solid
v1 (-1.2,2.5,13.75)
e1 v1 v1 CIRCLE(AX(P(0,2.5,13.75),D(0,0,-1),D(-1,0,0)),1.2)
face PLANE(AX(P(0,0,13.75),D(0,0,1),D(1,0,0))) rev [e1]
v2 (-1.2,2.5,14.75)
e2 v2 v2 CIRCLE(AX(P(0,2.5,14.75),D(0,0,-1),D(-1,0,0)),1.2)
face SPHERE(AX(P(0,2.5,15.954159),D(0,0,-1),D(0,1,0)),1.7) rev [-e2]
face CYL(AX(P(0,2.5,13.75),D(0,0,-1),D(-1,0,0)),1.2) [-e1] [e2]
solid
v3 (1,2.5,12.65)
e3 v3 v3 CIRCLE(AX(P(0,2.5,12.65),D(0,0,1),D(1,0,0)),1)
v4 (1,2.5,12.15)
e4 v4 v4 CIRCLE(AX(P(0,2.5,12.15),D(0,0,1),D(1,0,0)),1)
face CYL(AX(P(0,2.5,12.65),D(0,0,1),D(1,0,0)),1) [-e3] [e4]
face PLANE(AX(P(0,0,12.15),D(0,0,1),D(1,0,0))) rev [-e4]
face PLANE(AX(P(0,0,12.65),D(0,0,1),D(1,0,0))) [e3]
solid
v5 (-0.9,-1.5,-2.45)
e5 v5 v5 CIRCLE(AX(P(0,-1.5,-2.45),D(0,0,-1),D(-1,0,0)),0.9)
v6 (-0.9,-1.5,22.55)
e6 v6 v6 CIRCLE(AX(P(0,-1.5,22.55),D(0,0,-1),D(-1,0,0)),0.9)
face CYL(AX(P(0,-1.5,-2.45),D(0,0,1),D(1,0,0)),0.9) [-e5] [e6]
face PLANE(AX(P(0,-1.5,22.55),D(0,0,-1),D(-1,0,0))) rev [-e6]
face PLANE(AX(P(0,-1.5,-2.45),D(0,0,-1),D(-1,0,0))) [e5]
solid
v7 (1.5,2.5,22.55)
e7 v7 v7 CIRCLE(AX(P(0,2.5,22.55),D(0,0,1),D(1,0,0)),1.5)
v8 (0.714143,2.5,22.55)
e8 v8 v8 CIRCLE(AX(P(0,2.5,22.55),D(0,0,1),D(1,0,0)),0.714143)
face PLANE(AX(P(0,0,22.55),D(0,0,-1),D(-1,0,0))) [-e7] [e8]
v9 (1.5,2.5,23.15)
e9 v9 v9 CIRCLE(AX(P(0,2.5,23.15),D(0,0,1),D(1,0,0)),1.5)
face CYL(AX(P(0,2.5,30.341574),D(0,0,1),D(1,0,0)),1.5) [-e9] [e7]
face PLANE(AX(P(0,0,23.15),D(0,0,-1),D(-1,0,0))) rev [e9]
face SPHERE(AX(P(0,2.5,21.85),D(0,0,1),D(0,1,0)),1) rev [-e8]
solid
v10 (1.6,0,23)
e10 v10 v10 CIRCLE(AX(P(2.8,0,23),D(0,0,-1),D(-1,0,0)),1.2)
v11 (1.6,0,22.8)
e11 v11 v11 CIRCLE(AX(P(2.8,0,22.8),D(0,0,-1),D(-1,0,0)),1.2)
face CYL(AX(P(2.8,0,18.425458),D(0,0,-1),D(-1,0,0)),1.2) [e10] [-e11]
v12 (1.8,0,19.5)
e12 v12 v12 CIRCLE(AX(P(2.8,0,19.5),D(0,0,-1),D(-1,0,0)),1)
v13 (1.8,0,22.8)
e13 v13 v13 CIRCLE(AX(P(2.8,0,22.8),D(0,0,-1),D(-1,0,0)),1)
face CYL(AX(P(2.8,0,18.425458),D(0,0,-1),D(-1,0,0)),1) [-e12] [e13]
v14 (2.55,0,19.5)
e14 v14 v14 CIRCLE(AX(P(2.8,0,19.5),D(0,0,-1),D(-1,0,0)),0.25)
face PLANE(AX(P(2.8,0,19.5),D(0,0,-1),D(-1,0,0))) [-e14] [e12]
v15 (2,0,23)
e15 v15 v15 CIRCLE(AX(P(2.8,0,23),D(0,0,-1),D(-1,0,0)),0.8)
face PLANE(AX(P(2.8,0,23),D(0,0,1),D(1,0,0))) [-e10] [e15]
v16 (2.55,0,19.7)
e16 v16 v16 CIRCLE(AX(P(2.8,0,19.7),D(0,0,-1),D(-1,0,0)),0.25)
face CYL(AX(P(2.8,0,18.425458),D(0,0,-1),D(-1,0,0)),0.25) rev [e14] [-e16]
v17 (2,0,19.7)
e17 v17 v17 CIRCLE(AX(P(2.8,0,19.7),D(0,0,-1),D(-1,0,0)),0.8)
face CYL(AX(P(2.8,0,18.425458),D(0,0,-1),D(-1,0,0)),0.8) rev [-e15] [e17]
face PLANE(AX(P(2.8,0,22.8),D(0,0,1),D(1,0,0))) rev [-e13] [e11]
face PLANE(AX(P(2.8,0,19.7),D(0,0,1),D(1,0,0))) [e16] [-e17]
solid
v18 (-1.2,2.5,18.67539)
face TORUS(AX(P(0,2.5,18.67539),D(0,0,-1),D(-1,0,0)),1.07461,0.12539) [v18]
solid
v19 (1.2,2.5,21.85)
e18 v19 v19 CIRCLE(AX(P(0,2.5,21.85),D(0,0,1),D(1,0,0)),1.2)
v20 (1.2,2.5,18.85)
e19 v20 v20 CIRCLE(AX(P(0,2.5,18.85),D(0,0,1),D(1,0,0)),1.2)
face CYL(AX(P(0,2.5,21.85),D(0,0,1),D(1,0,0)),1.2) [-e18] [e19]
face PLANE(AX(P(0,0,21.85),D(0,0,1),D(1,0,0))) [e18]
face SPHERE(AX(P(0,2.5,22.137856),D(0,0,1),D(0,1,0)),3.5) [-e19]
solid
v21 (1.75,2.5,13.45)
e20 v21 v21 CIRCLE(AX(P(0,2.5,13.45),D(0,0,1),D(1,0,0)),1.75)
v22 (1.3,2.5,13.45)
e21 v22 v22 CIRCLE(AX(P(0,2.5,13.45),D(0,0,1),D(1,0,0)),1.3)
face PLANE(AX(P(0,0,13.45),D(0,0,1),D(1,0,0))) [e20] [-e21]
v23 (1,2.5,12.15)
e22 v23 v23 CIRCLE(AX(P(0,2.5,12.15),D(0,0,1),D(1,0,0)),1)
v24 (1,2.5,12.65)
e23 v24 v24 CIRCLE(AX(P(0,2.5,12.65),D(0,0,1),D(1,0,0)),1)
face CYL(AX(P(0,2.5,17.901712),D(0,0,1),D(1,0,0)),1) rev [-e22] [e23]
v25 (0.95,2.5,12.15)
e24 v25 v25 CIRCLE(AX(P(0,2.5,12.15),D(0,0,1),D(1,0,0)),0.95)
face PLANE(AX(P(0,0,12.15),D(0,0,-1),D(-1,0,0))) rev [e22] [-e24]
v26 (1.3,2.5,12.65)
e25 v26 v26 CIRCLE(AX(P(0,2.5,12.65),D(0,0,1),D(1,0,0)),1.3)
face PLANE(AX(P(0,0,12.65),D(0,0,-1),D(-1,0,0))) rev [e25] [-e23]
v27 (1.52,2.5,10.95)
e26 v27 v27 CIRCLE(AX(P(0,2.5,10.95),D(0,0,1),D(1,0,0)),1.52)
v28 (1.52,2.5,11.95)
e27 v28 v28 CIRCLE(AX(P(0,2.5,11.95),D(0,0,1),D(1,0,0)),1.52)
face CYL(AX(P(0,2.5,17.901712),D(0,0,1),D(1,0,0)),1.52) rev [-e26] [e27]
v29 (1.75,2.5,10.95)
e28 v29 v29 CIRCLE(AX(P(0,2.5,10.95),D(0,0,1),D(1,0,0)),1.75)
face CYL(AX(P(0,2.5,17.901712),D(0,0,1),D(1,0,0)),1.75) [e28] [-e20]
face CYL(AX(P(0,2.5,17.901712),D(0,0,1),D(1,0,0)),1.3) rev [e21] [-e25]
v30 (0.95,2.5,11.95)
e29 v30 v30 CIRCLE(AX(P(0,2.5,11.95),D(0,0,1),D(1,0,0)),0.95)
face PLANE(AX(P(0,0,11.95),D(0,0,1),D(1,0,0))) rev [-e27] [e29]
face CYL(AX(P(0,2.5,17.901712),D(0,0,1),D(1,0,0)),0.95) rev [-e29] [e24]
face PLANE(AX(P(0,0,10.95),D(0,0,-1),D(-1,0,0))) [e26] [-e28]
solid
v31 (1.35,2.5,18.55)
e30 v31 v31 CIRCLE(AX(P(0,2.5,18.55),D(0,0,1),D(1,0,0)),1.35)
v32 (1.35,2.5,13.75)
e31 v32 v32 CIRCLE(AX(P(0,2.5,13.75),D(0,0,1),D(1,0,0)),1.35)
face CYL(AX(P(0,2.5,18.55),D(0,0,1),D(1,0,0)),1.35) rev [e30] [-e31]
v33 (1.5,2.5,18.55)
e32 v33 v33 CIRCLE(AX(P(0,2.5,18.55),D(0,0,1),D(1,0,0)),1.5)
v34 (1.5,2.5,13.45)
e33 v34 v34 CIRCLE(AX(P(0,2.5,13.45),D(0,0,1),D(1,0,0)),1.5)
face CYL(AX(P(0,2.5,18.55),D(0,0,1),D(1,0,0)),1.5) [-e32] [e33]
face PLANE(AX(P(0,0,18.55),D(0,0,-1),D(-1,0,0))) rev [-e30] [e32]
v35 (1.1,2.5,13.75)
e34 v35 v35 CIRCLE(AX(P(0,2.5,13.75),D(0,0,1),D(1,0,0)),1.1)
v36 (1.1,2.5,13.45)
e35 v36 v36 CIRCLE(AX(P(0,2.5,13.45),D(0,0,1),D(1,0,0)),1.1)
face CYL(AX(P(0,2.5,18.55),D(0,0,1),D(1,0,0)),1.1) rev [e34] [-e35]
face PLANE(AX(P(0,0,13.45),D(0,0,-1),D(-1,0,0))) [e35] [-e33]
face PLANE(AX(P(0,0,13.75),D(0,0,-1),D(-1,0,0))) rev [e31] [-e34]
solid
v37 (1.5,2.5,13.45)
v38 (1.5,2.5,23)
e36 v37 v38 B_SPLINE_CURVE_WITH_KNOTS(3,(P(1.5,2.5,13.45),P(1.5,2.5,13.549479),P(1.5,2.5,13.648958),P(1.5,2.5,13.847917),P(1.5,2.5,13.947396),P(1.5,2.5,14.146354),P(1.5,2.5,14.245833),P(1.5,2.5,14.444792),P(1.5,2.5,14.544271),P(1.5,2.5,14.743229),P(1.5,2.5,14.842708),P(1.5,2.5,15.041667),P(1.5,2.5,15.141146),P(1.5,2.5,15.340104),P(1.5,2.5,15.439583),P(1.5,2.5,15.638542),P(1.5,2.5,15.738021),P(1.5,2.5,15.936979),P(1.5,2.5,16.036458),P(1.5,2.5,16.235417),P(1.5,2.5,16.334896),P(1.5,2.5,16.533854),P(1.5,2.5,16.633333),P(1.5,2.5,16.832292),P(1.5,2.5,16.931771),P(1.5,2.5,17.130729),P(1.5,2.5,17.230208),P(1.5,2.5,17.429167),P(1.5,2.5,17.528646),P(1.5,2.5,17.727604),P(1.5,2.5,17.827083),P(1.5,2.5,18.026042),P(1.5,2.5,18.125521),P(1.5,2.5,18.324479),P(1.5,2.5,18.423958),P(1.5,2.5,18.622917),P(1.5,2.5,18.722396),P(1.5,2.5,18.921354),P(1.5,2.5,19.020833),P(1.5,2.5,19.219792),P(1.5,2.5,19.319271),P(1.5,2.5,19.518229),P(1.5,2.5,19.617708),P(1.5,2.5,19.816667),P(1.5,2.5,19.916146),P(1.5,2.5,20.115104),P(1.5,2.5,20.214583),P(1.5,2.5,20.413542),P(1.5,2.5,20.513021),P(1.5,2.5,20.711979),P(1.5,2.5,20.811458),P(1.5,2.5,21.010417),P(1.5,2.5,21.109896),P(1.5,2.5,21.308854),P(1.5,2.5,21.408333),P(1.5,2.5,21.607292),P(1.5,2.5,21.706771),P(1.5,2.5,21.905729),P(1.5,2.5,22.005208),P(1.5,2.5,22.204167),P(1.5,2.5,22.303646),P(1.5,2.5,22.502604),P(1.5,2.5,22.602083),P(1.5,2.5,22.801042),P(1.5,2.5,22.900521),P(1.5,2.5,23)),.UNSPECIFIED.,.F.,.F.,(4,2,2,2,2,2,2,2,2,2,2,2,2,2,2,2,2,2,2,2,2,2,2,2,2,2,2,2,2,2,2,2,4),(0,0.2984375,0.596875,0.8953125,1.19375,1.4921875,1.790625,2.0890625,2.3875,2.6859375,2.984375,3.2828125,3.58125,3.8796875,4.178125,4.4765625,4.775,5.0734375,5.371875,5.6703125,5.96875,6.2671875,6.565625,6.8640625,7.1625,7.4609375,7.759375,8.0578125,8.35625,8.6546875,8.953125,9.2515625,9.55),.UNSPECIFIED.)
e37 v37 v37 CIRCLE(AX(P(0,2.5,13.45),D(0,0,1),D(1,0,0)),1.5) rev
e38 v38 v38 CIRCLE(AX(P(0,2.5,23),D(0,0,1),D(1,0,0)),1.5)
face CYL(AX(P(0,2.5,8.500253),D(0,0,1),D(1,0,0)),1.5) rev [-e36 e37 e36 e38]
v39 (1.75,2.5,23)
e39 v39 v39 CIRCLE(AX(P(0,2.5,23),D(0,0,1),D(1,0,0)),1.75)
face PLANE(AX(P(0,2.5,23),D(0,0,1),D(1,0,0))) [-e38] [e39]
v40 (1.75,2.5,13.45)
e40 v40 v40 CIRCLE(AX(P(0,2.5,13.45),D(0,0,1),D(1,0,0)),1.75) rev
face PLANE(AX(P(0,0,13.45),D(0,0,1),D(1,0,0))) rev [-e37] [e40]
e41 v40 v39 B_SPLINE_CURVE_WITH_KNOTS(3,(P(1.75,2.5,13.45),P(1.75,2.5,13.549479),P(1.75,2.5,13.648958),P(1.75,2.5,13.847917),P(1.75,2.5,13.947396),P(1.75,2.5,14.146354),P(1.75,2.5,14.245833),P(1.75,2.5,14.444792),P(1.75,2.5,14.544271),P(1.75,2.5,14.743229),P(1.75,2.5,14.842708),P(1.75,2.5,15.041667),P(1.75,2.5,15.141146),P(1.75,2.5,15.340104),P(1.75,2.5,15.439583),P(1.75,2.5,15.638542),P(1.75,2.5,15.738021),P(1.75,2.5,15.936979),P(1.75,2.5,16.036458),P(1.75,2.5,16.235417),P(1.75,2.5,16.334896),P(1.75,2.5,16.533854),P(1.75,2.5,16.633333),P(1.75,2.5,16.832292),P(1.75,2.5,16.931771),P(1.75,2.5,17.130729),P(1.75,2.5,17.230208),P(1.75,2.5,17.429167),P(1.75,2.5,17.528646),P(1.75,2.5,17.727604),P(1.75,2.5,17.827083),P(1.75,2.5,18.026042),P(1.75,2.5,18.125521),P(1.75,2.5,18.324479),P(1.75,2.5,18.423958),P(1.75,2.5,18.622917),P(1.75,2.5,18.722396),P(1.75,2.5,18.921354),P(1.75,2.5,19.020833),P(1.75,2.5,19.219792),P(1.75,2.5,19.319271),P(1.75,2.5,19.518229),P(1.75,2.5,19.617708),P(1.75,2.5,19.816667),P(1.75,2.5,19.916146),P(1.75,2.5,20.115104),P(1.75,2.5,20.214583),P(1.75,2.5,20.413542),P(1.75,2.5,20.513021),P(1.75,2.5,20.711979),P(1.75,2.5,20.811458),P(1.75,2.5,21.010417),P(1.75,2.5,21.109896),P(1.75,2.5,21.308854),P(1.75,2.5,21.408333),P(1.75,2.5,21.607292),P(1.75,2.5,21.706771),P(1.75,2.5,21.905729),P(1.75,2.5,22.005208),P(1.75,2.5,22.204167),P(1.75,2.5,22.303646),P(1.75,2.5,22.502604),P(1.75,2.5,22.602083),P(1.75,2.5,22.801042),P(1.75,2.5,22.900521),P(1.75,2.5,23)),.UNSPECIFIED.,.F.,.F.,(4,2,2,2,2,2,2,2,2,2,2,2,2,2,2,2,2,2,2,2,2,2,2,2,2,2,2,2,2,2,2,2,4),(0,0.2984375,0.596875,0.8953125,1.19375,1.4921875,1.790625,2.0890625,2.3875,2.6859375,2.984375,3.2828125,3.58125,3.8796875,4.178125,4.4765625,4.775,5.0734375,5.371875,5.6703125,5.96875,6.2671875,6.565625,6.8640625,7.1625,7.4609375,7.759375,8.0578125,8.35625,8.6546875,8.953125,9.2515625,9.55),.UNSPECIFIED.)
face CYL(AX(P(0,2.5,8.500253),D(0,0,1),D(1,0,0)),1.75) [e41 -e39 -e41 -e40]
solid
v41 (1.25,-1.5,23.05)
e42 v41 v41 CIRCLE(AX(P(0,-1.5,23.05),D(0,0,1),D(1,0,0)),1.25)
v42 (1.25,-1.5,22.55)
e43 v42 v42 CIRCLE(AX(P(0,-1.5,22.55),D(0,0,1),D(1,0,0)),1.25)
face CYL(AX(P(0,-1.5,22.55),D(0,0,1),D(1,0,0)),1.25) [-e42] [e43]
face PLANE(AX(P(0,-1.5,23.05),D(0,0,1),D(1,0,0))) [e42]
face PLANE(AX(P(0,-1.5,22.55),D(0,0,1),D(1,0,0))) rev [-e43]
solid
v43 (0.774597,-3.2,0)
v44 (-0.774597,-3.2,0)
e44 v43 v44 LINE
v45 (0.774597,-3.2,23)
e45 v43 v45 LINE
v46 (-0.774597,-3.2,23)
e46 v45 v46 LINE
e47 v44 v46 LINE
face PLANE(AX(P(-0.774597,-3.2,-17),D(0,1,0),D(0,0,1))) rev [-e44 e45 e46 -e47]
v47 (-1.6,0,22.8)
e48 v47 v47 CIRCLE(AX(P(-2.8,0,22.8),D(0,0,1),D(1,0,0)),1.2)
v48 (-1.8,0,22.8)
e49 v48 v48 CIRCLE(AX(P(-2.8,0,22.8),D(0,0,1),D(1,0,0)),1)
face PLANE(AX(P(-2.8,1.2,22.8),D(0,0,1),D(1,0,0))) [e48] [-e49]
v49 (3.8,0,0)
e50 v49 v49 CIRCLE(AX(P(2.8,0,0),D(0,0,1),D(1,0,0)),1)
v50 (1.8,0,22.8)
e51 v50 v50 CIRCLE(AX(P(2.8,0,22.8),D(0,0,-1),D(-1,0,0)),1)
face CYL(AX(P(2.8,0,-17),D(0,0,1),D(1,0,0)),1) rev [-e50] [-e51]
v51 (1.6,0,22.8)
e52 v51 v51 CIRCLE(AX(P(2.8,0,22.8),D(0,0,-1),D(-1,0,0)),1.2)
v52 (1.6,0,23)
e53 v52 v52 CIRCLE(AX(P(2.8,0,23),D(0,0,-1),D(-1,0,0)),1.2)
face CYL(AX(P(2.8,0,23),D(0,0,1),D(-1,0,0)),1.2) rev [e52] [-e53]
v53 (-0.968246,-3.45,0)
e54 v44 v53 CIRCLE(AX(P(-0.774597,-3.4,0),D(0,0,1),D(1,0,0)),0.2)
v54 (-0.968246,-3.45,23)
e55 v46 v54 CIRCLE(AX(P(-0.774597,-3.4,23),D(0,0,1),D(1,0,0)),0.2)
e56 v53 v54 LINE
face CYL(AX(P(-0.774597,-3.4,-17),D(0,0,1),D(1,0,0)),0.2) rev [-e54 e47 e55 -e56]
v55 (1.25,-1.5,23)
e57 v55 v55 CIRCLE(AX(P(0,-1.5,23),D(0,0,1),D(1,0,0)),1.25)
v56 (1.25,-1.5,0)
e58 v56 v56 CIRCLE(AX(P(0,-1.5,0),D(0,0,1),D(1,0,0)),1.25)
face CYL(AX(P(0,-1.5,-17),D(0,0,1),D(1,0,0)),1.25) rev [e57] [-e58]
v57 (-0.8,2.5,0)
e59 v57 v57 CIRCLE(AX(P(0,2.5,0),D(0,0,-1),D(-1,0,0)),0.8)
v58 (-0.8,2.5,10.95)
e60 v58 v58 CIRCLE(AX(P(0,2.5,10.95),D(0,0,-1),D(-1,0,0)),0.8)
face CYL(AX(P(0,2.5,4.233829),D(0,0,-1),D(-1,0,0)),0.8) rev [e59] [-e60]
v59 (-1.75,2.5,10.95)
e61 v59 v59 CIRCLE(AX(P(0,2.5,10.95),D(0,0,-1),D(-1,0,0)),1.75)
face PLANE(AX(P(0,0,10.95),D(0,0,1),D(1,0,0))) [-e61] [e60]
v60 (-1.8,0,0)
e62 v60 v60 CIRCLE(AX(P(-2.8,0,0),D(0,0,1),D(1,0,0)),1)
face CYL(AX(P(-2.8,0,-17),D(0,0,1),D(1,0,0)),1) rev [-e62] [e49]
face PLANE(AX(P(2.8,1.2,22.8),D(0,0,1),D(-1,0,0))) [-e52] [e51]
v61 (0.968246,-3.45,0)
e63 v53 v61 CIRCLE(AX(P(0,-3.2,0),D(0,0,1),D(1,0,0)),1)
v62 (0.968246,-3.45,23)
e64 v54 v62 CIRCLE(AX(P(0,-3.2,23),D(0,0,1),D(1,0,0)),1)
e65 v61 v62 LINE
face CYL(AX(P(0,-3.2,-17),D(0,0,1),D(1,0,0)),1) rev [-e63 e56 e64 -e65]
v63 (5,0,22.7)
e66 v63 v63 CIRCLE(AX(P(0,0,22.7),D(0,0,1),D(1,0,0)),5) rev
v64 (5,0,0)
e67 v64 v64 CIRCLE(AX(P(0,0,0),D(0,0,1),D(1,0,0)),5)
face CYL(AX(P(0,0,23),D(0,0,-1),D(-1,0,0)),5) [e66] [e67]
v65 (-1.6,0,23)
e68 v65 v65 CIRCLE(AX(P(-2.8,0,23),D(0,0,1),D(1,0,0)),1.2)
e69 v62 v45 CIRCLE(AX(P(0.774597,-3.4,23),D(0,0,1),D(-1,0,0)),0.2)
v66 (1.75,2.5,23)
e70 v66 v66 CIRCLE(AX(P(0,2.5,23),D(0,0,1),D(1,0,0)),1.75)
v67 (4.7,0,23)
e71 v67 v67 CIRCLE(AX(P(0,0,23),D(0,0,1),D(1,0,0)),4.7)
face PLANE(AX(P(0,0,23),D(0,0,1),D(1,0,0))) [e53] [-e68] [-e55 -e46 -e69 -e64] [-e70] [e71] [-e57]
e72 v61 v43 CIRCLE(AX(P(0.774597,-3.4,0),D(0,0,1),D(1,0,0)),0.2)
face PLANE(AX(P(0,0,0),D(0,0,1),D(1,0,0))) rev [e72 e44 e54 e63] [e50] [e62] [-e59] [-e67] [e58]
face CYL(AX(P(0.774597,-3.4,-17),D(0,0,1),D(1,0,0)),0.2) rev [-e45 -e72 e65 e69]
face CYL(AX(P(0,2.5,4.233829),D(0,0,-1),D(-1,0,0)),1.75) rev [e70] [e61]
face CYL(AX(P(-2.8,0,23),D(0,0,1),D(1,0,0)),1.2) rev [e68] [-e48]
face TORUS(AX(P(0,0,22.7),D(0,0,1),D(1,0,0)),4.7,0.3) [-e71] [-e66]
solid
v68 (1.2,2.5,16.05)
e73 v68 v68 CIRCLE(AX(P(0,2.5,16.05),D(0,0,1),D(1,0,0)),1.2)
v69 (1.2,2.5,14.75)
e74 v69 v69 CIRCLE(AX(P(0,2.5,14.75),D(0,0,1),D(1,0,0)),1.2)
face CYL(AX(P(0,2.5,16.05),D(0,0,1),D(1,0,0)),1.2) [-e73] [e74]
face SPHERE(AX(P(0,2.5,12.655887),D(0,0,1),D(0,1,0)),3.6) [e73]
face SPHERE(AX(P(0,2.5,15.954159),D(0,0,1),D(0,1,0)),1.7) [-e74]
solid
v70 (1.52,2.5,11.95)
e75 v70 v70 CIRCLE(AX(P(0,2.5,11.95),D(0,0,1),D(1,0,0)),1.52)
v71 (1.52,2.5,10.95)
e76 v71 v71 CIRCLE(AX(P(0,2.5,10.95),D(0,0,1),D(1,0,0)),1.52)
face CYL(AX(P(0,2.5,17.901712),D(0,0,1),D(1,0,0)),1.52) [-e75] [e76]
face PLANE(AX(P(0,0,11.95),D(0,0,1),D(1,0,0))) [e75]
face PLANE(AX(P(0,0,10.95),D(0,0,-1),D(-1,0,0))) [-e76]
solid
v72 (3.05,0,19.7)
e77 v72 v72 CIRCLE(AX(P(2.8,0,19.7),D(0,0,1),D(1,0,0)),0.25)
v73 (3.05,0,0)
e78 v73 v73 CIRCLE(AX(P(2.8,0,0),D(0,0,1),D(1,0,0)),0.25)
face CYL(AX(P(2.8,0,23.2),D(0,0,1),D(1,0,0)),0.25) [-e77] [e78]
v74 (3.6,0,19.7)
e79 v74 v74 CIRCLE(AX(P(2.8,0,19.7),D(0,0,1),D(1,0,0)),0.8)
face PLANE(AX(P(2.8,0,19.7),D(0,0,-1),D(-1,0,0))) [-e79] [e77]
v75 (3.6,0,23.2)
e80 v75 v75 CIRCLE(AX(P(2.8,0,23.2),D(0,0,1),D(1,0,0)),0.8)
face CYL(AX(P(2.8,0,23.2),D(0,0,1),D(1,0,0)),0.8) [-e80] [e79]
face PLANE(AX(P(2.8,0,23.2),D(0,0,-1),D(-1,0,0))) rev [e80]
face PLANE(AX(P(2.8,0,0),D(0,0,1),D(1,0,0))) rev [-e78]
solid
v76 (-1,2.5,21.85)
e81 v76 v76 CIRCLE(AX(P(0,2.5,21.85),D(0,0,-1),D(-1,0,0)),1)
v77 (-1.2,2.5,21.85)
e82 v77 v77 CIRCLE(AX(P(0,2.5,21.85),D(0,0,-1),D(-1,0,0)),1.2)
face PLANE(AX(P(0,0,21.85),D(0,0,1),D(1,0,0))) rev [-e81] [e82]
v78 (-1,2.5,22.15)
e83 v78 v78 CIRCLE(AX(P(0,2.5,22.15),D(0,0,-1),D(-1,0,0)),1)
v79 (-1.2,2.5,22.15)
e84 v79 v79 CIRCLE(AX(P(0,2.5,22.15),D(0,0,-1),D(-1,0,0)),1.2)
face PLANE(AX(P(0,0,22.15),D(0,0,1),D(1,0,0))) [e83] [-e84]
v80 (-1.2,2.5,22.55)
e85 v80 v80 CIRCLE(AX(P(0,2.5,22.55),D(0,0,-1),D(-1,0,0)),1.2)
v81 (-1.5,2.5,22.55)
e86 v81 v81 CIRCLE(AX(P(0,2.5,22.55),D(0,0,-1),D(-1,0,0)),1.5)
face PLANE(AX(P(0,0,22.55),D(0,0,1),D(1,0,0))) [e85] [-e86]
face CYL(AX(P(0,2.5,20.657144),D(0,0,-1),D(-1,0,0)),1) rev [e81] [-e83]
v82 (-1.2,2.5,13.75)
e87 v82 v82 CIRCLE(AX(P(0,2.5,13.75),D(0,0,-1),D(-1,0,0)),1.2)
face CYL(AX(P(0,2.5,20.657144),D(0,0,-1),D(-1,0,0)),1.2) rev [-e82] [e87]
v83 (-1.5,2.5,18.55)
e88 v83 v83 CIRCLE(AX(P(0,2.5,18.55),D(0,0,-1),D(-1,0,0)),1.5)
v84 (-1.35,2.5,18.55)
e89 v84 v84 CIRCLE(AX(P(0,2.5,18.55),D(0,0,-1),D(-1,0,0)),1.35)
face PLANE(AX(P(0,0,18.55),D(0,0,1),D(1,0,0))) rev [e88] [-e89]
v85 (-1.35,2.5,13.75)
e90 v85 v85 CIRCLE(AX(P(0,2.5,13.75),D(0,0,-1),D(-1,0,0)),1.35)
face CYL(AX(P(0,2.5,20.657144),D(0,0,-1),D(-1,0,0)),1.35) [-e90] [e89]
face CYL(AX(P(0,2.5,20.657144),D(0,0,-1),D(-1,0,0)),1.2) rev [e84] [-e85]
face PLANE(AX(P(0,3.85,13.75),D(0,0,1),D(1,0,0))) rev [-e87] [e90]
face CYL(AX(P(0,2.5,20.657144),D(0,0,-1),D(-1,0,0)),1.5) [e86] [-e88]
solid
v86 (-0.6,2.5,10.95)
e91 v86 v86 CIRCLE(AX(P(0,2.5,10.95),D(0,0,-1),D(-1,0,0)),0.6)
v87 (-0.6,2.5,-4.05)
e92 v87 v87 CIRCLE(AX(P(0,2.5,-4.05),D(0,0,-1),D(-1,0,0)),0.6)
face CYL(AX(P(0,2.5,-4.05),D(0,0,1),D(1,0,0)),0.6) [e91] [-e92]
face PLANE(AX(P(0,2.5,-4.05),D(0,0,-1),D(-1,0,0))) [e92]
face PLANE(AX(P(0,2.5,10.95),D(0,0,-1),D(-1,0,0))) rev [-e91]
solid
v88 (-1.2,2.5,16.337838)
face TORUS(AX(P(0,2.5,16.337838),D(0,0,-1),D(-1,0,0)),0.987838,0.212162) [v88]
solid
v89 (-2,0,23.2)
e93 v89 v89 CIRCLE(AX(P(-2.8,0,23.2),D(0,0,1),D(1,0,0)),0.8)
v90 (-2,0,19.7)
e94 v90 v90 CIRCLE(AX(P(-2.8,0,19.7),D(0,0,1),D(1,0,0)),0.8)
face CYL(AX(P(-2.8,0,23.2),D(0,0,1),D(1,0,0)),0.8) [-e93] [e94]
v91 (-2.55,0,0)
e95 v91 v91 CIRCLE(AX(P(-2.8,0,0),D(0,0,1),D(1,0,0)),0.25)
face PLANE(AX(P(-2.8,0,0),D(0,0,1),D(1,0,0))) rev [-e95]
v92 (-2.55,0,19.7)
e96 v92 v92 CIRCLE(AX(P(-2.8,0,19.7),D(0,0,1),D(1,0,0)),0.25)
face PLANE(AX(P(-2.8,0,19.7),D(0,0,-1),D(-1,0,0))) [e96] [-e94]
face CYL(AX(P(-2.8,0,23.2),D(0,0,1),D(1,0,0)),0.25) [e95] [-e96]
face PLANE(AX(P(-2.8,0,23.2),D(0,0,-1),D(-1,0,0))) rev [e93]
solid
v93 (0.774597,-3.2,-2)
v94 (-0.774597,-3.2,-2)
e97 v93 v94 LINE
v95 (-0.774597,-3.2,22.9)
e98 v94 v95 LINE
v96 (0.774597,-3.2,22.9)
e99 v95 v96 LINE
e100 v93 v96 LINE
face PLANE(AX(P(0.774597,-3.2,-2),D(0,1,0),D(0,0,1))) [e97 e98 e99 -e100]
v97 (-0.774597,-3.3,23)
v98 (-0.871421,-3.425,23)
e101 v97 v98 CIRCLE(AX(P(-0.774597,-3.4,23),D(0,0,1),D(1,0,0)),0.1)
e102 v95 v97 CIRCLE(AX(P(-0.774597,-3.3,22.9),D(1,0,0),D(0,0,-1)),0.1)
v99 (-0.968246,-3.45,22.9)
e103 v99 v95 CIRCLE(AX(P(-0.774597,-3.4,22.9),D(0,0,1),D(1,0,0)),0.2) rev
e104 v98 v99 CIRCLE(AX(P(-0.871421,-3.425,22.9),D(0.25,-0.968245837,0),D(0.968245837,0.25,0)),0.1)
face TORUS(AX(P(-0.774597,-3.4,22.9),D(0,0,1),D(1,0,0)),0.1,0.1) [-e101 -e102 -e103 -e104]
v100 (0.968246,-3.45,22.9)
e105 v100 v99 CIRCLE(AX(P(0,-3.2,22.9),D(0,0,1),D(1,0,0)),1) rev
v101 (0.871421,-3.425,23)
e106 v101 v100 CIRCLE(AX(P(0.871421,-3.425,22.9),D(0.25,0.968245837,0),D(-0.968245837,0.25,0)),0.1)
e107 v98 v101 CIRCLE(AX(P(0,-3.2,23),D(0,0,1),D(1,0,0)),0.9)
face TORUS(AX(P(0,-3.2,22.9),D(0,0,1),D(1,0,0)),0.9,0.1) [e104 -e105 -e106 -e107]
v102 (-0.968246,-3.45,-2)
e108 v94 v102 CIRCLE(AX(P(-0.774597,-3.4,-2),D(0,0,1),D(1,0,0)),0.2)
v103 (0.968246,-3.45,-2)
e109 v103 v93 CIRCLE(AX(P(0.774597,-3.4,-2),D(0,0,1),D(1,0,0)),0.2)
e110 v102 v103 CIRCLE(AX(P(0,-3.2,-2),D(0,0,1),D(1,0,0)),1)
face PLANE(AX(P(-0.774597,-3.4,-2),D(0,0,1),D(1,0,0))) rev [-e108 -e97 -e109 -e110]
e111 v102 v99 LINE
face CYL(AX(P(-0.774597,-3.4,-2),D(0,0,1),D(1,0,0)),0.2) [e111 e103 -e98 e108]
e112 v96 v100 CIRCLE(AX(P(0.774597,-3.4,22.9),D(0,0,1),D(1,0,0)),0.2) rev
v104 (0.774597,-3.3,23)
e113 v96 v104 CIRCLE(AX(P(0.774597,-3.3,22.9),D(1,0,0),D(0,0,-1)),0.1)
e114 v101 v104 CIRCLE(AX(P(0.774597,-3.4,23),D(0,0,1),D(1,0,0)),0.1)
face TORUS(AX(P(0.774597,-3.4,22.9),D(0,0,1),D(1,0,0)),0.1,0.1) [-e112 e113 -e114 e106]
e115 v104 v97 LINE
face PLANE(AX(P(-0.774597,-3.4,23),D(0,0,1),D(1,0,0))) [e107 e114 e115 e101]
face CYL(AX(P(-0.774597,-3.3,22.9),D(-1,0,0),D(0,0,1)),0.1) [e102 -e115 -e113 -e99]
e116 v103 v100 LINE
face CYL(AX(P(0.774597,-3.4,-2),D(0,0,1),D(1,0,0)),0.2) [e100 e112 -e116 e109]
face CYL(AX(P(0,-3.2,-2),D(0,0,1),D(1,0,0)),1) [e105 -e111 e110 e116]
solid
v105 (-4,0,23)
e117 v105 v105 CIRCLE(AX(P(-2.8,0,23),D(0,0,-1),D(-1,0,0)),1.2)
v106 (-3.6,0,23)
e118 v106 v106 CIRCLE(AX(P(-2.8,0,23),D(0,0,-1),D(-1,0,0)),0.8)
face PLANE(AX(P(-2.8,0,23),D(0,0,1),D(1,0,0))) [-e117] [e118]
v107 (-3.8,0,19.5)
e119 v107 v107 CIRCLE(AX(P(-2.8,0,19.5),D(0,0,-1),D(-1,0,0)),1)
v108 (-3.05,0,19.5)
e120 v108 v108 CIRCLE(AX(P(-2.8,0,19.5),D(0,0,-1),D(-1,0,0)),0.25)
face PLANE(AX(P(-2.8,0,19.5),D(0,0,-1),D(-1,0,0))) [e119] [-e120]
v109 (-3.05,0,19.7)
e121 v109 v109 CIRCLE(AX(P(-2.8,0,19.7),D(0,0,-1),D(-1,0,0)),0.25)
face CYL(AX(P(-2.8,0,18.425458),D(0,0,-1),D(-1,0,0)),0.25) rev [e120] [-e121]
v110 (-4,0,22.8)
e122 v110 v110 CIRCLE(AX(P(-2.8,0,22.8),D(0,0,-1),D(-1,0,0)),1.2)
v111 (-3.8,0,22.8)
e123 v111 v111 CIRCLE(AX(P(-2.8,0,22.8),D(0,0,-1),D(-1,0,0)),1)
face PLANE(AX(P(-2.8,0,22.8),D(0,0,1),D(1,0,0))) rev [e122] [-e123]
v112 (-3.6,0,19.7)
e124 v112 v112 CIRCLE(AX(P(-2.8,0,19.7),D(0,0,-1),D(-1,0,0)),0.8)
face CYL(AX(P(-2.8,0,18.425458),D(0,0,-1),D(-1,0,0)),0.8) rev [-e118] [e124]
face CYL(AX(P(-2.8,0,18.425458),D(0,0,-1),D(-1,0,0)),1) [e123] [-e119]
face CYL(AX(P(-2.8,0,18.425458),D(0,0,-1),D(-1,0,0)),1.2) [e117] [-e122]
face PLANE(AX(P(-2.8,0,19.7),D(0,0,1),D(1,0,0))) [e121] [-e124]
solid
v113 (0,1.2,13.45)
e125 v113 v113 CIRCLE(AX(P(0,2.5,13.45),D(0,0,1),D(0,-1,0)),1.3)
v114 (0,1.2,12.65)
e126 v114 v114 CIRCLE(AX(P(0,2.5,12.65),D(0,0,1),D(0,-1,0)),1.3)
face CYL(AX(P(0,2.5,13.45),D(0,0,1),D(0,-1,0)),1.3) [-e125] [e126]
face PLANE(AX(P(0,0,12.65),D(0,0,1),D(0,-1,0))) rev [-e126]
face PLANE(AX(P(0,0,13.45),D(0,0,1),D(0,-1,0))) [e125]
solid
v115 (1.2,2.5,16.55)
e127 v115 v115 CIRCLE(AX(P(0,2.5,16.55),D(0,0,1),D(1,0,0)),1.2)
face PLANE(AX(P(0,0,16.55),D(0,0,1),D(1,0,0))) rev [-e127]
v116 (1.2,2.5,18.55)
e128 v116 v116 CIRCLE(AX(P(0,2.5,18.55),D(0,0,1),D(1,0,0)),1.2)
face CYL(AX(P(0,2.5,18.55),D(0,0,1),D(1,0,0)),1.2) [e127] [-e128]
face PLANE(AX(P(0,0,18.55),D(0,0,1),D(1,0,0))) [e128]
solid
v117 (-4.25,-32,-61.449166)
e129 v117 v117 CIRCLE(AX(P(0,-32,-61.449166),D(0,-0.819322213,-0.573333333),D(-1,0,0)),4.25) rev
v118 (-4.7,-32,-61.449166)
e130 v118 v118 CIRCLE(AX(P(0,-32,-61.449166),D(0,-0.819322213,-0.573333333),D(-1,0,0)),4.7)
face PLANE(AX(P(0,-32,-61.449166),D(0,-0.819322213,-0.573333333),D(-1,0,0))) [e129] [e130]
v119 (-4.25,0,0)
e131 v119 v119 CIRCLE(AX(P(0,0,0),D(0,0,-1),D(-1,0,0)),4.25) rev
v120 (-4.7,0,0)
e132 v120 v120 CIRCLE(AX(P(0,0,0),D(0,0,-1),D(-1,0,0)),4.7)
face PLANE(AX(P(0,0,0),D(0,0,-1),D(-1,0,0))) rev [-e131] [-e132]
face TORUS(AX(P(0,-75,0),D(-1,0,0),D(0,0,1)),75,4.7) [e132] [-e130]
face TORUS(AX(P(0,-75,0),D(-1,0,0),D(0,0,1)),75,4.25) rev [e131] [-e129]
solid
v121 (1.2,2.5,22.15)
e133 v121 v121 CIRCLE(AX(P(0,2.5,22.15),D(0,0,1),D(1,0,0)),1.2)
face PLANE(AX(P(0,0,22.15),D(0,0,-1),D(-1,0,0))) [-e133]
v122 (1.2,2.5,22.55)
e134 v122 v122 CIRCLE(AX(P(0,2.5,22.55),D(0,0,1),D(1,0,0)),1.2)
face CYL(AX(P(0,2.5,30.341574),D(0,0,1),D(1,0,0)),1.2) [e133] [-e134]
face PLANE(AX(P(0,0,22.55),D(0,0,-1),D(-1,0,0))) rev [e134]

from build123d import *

# Parameters (mm, degrees)
SKETCH1_R      = 5
EXTRUDE1_DEPTH = 23
SKETCH2_R      = 1.5
SKETCH2_R_2    = 1
SKETCH2_R_3    = 1.25
EXTRUDE2_DEPTH = 40
SKETCH3_W      = 10.95
SKETCH3_H      = 0.7
SKETCH_W       = 2.5
SKETCH_H       = 0.25
EXTRUDE3_START = -9.55
SKETCH4_R      = 1.75
EXTRUDE3_DEPTH = 9.55
SKETCH5_W      = 0.2
SKETCH5_H      = 0.2
EXTRUDE4_DEPTH = 25
FILLET2_R      = 0.1
FILLET3_R      = 0.3
SKETCH_3_W     = 3
SKETCH_3_H     = 1.2
SKETCH_4_W     = 2
SKETCH_4_H     = 1.2
SKETCH_5_W     = 1.3
SKETCH_5_H     = 1.2
SKETCH_7_W     = 0.8
SKETCH_7_H     = 1.3
SKETCH_8_W     = 0.5
SKETCH_8_H     = 1
SKETCH9_W      = 4
SKETCH9_H      = 0.3
SKETCH9_W_2    = 0.3
SKETCH9_H_2    = 0.2
SKETCH9_W_3    = 4.8
SKETCH9_H_3    = 0.15
SKETCH10_W     = 0.3
SKETCH10_H     = 0.25
SKETCH10_W_2   = 5.1
SKETCH10_H_2   = 0.15
SKETCH11_W     = 1.5
SKETCH11_H     = 0.45
SKETCH11_W_2   = 0.5
SKETCH11_H_2   = 0.3
SKETCH11_W_3   = 1
SKETCH11_H_3   = 0.23
SKETCH13_R     = 0.125390483
SKETCH_10_R    = 0.212162274
SKETCH15_R     = 1.75
SKETCH15_R_2   = 1.5
EXTRUDE5_DEPTH = 9.55
SKETCH16_R     = 0.6
EXTRUDE6_DEPTH = 15
EXTRUDE7_START = 0.05
SKETCH17_R     = 1.25
EXTRUDE7_DEPTH = 0.5
SKETCH18_R     = 0.9
EXTRUDE8_DEPTH = 25
SKETCH19_W     = 3.5
SKETCH19_H     = 0.8
SKETCH19_W_2   = 19.7
SKETCH19_H_2   = 0.25
SKETCH20_W     = 0.2
SKETCH20_H     = 0.4
SKETCH20_H_2   = 0.55
SKETCH21_W     = 3.5
SKETCH21_H     = 0.8
SKETCH21_W_2   = 19.7
SKETCH21_H_2   = 0.25
SKETCH22_W     = 0.2
SKETCH22_H     = 0.4
SKETCH22_H_2   = 0.55
SKETCH23_R     = 4.7
SKETCH23_R_2   = 4.25


with BuildPart() as part:
    # Sketch1 → Extrude1 (new body)
    with BuildSketch(Plane.XY):
        Circle(SKETCH1_R)
    extrude(amount=EXTRUDE1_DEPTH)

    # Sketch2 → Extrude2 (cut)
    with BuildSketch(Plane.XY.offset(23)):
        with Locations((0, 2.5)):
            Circle(SKETCH2_R)
        with Locations((2.8, 0)):
            Circle(SKETCH2_R_2)
        with Locations((0, -1.5)):
            Circle(SKETCH2_R_3)
        with Locations((-2.8, 0)):
            Circle(SKETCH2_R_2)
        with BuildLine():
            Line((-0.774596669, -3.2), (0.774596669, -3.2))
            ThreePointArc((0.774596669, -3.2), (0.932710552, -3.277525513), (0.968245837, -3.45))
            ThreePointArc((0.968245837, -3.45), (0, -4.2), (-0.968245837, -3.45))
            ThreePointArc((-0.968245837, -3.45), (-0.932710552, -3.277525513), (-0.774596669, -3.2))
        make_face()
    extrude(amount=-EXTRUDE2_DEPTH, mode=Mode.SUBTRACT)

    # Sketch3 → Revolve1 (revolve)
    with BuildSketch(Plane(origin=(0, 0, 0), x_dir=(0, 0, -1), z_dir=(1, 0, 0)), mode=Mode.PRIVATE) as revolve1_sk:
        with Locations((-5.475, 3.65)):
            Rectangle(SKETCH3_W, SKETCH3_H)
    revolve(revolve1_sk.sketch.rotate(Axis((0, 2.5, 4.233828538), (0, 0, 1)), 270), axis=Axis((0, 2.5, 4.233828538), (0, 0, 1)))

    # Sketch → Cut-Revolve1 (revolve, cut)
    with BuildSketch(Plane(origin=(0, 0, 0), x_dir=(0, 0, -1), z_dir=(1, 0, 0)), mode=Mode.PRIVATE) as cut_revolve1_sk:
        with Locations((-12.2, 4.125)):
            Rectangle(SKETCH_W, SKETCH_H)
    revolve(cut_revolve1_sk.sketch.rotate(Axis((0, 2.5, 4.233828538), (0, 0, 1)), 90), axis=Axis((0, 2.5, 4.233828538), (0, 0, 1)), mode=Mode.SUBTRACT)

    # Sketch4 → Extrude3 (cut)
    with BuildSketch(Plane.XY.offset(23).offset(EXTRUDE3_START)):
        with Locations(Location((0, 2.5, 0), (0, 0, 180))):
            Circle(SKETCH4_R)
    extrude(amount=EXTRUDE3_DEPTH, mode=Mode.SUBTRACT)

    # Sketch5 → Cut-Revolve2 (revolve, cut)
    with BuildSketch(Plane(origin=(-2.8, 0, 0), x_dir=(0, 0, -1), z_dir=(1, 0, 0)), mode=Mode.PRIVATE) as cut_revolve2_sk:
        with Locations((-22.9, 1.1)):
            Rectangle(SKETCH5_W, SKETCH5_H)
    cut_revolve2 = revolve(cut_revolve2_sk.sketch.rotate(Axis((-2.8, 0, 23), (0, 0, -1)), 90), axis=Axis((-2.8, 0, 23), (0, 0, -1)), mode=Mode.SUBTRACT)

    # Mirror1: Cut-Revolve2 across plane
    add(cut_revolve2.mirror(Plane(origin=(0, 0, 0), x_dir=(0, 0, 1), z_dir=(1, 0, 0))), mode=Mode.SUBTRACT)

    # Fillet3
    fillet3_edges = [part.edges().sort_by_distance(p)[0] for p in [
        (-5, 0, 23),
    ]]
    fillet(fillet3_edges, radius=FILLET3_R)


with BuildPart() as body_2:
    # Sketch6 → Extrude4 (new body)
    with BuildSketch(Plane.XY.offset(23)):
        with BuildLine():
            Line((0.774596669, -3.2), (-0.774596669, -3.2))
            ThreePointArc((-0.774596669, -3.2), (-0.932710552, -3.277525513), (-0.968245837, -3.45))
            ThreePointArc((-0.968245837, -3.45), (0, -4.2), (0.968245837, -3.45))
            ThreePointArc((0.968245837, -3.45), (0.932710552, -3.277525513), (0.774596669, -3.2))
        make_face()
    extrude(amount=-EXTRUDE4_DEPTH)

    # Fillet2
    fillet2_edges = [body_2.edges().sort_by_distance(p)[0] for p in [
        (0, -3.2, 23),
        (0.932710552, -3.277525513, 23),
        (0, -4.2, 23),
        (-0.932710552, -3.277525513, 23),
    ]]
    fillet(fillet2_edges, radius=FILLET2_R)


with BuildPart() as body_3:
    # Sketch7 → Revolve2 (revolve)
    with BuildSketch(Plane(origin=(0, 0, 0), x_dir=(0, 0, -1), z_dir=(1, 0, 0))):
        with BuildLine():
            Line((-22.55, 4), (-23.15, 4))
            Line((-23.15, 4), (-23.15, 2.5))
            Line((-23.15, 2.5), (-22.85, 2.5))
            ThreePointArc((-22.85, 2.5), (-22.771954446, 2.887298335), (-22.55, 3.214142843))
            Line((-22.55, 3.214142843), (-22.55, 3.7))
            Line((-22.55, 3.7), (-22.55, 4))
        make_face()
    revolve(axis=Axis((0, 2.5, 30.341573658), (0, 0, -1)))


with BuildPart() as body_4:
    # Sketch 2 → Revolve3 (revolve)
    with BuildSketch(Plane(origin=(0, 0, 0), x_dir=(0, 0, -1), z_dir=(1, 0, 0)), mode=Mode.PRIVATE) as revolve3_sk:
        Polygon((-22.15, 3.7), (-22.55, 3.7), (-22.55, 3.214142843), (-22.55, 2.5), (-22.15, 2.5), align=None)
    revolve(revolve3_sk.sketch.rotate(Axis((0, 2.5, 30.341573658), (0, 0, -1)), 90), axis=Axis((0, 2.5, 30.341573658), (0, 0, -1)))


with BuildPart() as body_5:
    # Sketch 3 → Revolve4 (revolve)
    with BuildSketch(Plane(origin=(0, 0, 0), x_dir=(0, 0, -1), z_dir=(1, 0, 0))):
        with Locations((-20.35, 3.1)):
            Rectangle(SKETCH_3_W, SKETCH_3_H)
        with BuildLine():
            ThreePointArc((-18.85, 3.7), (-18.69130037, 3.109303883), (-18.637856445, 2.5))
            Line((-18.637856445, 2.5), (-18.85, 2.5))
            Line((-18.85, 2.5), (-18.85, 3.7))
        make_face()
    revolve(axis=Axis((0, 2.5, 21.85), (0, 0, -1)))


with BuildPart() as body_6:
    # Sketch 4 → Revolve5 (revolve)
    with BuildSketch(Plane(origin=(0, 0, 0), x_dir=(0, 0, -1), z_dir=(1, 0, 0)), mode=Mode.PRIVATE) as revolve5_sk:
        with Locations((-17.55, 3.1)):
            Rectangle(SKETCH_4_W, SKETCH_4_H)
    revolve(revolve5_sk.sketch.rotate(Axis((0, 2.5, 18.55), (0, 0, -1)), 90), axis=Axis((0, 2.5, 18.55), (0, 0, -1)))


with BuildPart() as body_7:
    # Sketch 5 → Revolve6 (revolve)
    with BuildSketch(Plane(origin=(0, 0, 0), x_dir=(0, 0, -1), z_dir=(1, 0, 0))):
        with Locations((-15.4, 3.1)):
            Rectangle(SKETCH_5_W, SKETCH_5_H)
        with BuildLine():
            ThreePointArc((-14.75, 3.7), (-14.383002069, 3.149202943), (-14.254159458, 2.5))
            Line((-14.254159458, 2.5), (-14.75, 2.5))
            Line((-14.75, 2.5), (-14.75, 3.7))
        make_face()
        with BuildLine():
            Line((-16.05, 2.5), (-16.05, 3.7))
            ThreePointArc((-16.05, 3.7), (-16.204042265, 3.108767123), (-16.25588745, 2.5))
            Line((-16.25588745, 2.5), (-16.05, 2.5))
        make_face()
    revolve(axis=Axis((0, 2.5, 16.05), (0, 0, -1)))


with BuildPart() as body_8:
    # Sketch 6 → Revolve7 (revolve)
    with BuildSketch(Plane(origin=(0, 0, 0), x_dir=(0, 0, -1), z_dir=(1, 0, 0)), mode=Mode.PRIVATE) as revolve7_sk:
        with BuildLine():
            Line((-14.75, 3.7), (-13.75, 3.7))
            Line((-13.75, 3.7), (-13.75, 2.5))
            Line((-13.75, 2.5), (-14.254159458, 2.5))
            ThreePointArc((-14.254159458, 2.5), (-14.383002069, 3.149202943), (-14.75, 3.7))
        make_face()
    revolve(revolve7_sk.sketch.rotate(Axis((0, 2.5, 13.75), (0, 0, 1)), 270), axis=Axis((0, 2.5, 13.75), (0, 0, 1)))


with BuildPart() as body_9:
    # Sketch 7 → Revolve8 (revolve)
    with BuildSketch(Plane(origin=(0, 0, 0), x_dir=(0, 0, -1), z_dir=(1, 0, 0)), mode=Mode.PRIVATE) as revolve8_sk:
        with Locations((-13.05, 3.15)):
            Rectangle(SKETCH_7_W, SKETCH_7_H)
    revolve(revolve8_sk.sketch.rotate(Axis((0, 2.5, 13.45), (0, 0, -1)), 90), axis=Axis((0, 2.5, 13.45), (0, 0, -1)))


with BuildPart() as body_10:
    # Sketch 8 → Revolve9 (revolve)
    with BuildSketch(Plane(origin=(0, 0, 0), x_dir=(0, 0, -1), z_dir=(1, 0, 0)), mode=Mode.PRIVATE) as revolve9_sk:
        with Locations((-12.4, 3)):
            Rectangle(SKETCH_8_W, SKETCH_8_H)
    revolve(revolve9_sk.sketch.rotate(Axis((0, 2.5, 12.65), (0, 0, -1)), 90), axis=Axis((0, 2.5, 12.65), (0, 0, -1)))


with BuildPart() as body_11:
    # Sketch9 → Revolve11 (revolve)
    with BuildSketch(Plane(origin=(0, 0, 0), x_dir=(0, 0, -1), z_dir=(1, 0, 0)), mode=Mode.PRIVATE) as revolve11_sk:
        with Locations((-20.55, 3.85)):
            Rectangle(SKETCH9_W, SKETCH9_H)
        with Locations((-22, 3.6)):
            Rectangle(SKETCH9_W_2, SKETCH9_H_2)
        with Locations((-16.15, 3.775)):
            Rectangle(SKETCH9_W_3, SKETCH9_H_3)
    revolve(revolve11_sk.sketch.rotate(Axis((0, 2.5, 20.657143519), (0, 0, 1)), 90), axis=Axis((0, 2.5, 20.657143519), (0, 0, 1)))


with BuildPart() as body_12:
    # Sketch10 → Revolve12 (revolve)
    with BuildSketch(Plane(origin=(0, 0, 0), x_dir=(0, 0, -1), z_dir=(1, 0, 0)), mode=Mode.PRIVATE) as revolve12_sk:
        with Locations((-13.6, 3.725)):
            Rectangle(SKETCH10_W, SKETCH10_H)
        with Locations((-16, 3.925)):
            Rectangle(SKETCH10_W_2, SKETCH10_H_2)
    revolve(revolve12_sk.sketch.rotate(Axis((0, 2.5, 20.657143519), (0, 0, -1)), 90), axis=Axis((0, 2.5, 20.657143519), (0, 0, -1)))


with BuildPart() as body_13:
    # Sketch11 → Revolve13 (revolve)
    with BuildSketch(Plane(origin=(0, 0, 0), x_dir=(0, 0, -1), z_dir=(1, 0, 0)), mode=Mode.PRIVATE) as revolve13_sk:
        with Locations((-12.7, 4.025)):
            Rectangle(SKETCH11_W, SKETCH11_H)
        with Locations((-12.4, 3.65)):
            Rectangle(SKETCH11_W_2, SKETCH11_H_2)
        Polygon((-11.95, 3.8), (-12.15, 3.8), (-12.15, 3.5), (-12.15, 3.45), (-11.95, 3.45), align=None)
        with Locations((-11.45, 4.135)):
            Rectangle(SKETCH11_W_3, SKETCH11_H_3)
    revolve(revolve13_sk.sketch.rotate(Axis((0, 2.5, 17.901712112), (0, 0, -1)), 90), axis=Axis((0, 2.5, 17.901712112), (0, 0, -1)))


with BuildPart() as body_14:
    # Sketch 9 → Revolve14 (revolve)
    with BuildSketch(Plane(origin=(0, 0, 0), x_dir=(0, 0, -1), z_dir=(1, 0, 0)), mode=Mode.PRIVATE) as revolve14_sk:
        Polygon((-11.95, 4.02), (-11.95, 3.8), (-11.95, 3.45), (-11.95, 2.5), (-10.95, 2.5), (-10.95, 4.02), align=None)
    revolve(revolve14_sk.sketch.rotate(Axis((0, 2.5, 17.901712112), (0, 0, -1)), 180), axis=Axis((0, 2.5, 17.901712112), (0, 0, -1)))


with BuildPart() as body_15:
    # Sketch13 → Revolve15 (revolve)
    with BuildSketch(Plane(origin=(0, 0, 0), x_dir=(0, 0, -1), z_dir=(1, 0, 0)), mode=Mode.PRIVATE) as revolve15_sk:
        with Locations((-18.675390483, 3.574609517)):
            Circle(SKETCH13_R)
    revolve(revolve15_sk.sketch.rotate(Axis((0, 2.5, 18.675390483), (0, 0, 1)), 270), axis=Axis((0, 2.5, 18.675390483), (0, 0, 1)))


with BuildPart() as body_16:
    # Sketch 10 → Revolve16 (revolve)
    with BuildSketch(Plane(origin=(0, 0, 0), x_dir=(0, 0, -1), z_dir=(1, 0, 0)), mode=Mode.PRIVATE) as revolve16_sk:
        with Locations((-16.337837726, 3.487837726)):
            Circle(SKETCH_10_R)
    revolve(revolve16_sk.sketch.rotate(Axis((0, 2.5, 18.55), (0, 0, 1)), 270), axis=Axis((0, 2.5, 18.55), (0, 0, 1)))


with BuildPart() as body_17:
    # Sketch15 → Extrude5 (new body)
    with BuildSketch(Plane.XY.offset(23)):
        with Locations((0, 2.5)):
            Circle(SKETCH15_R)
        with Locations((0, 2.5)):
            Circle(SKETCH15_R_2, mode=Mode.SUBTRACT)
    extrude(amount=-EXTRUDE5_DEPTH)


with BuildPart() as body_18:
    # Sketch16 → Extrude6 (new body)
    with BuildSketch(Plane(origin=(0, 0, 10.95), x_dir=(-1, 0, 0), z_dir=(0, 0, -1))):
        with Locations((0, 2.5)):
            Circle(SKETCH16_R)
    extrude(amount=EXTRUDE6_DEPTH)


with BuildPart() as body_19:
    # Sketch17 → Extrude7 (new body)
    with BuildSketch(Plane.XY.offset(23).offset(EXTRUDE7_START)):
        with Locations((0, -1.5)):
            Circle(SKETCH17_R)
    extrude(amount=-EXTRUDE7_DEPTH)


with BuildPart() as body_20:
    # Sketch18 → Extrude8 (new body)
    with BuildSketch(Plane(origin=(0, 0, 22.55), x_dir=(-1, 0, 0), z_dir=(0, 0, -1))):
        with Locations((0, -1.5)):
            Circle(SKETCH18_R)
    extrude(amount=EXTRUDE8_DEPTH)


with BuildPart() as body_21:
    # Sketch19 → Revolve17 (revolve)
    with BuildSketch(Plane(origin=(-2.8, 0, 0), x_dir=(0, 0, -1), z_dir=(1, 0, 0)), mode=Mode.PRIVATE) as revolve17_sk:
        with Locations((-21.45, 0.4)):
            Rectangle(SKETCH19_W, SKETCH19_H)
        with Locations((-9.85, 0.125)):
            Rectangle(SKETCH19_W_2, SKETCH19_H_2)
    revolve(revolve17_sk.sketch.rotate(Axis((-2.8, 0, 23.2), (0, 0, -1)), 90), axis=Axis((-2.8, 0, 23.2), (0, 0, -1)))


with BuildPart() as body_22:
    # Sketch20 → Revolve18 (revolve)
    with BuildSketch(Plane(origin=(-2.8, 0, 0), x_dir=(0, 0, -1), z_dir=(1, 0, 0)), mode=Mode.PRIVATE) as revolve18_sk:
        with Locations((-22.9, 1)):
            Rectangle(SKETCH20_W, SKETCH20_H)
        Polygon((-22.8, 1), (-22.8, 0.8), (-19.7, 0.8), (-19.5, 0.8), (-19.5, 1), align=None)
        with Locations((-19.6, 0.525)):
            Rectangle(SKETCH20_W, SKETCH20_H_2)
    revolve(revolve18_sk.sketch.rotate(Axis((-2.8, 0, 18.425457789), (0, 0, 1)), 90), axis=Axis((-2.8, 0, 18.425457789), (0, 0, 1)))


with BuildPart() as body_23:
    # Sketch21 → Revolve19 (revolve)
    with BuildSketch(Plane(origin=(2.8, 0, 0), x_dir=(0, 0, -1), z_dir=(1, 0, 0)), mode=Mode.PRIVATE) as revolve19_sk:
        with Locations((-21.45, 0.4)):
            Rectangle(SKETCH21_W, SKETCH21_H)
        with Locations((-9.85, 0.125)):
            Rectangle(SKETCH21_W_2, SKETCH21_H_2)
    revolve(revolve19_sk.sketch.rotate(Axis((2.8, 0, 23.2), (0, 0, -1)), 90), axis=Axis((2.8, 0, 23.2), (0, 0, -1)))


with BuildPart() as body_24:
    # Sketch22 → Revolve20 (revolve)
    with BuildSketch(Plane(origin=(2.8, 0, 0), x_dir=(0, 0, -1), z_dir=(1, 0, 0)), mode=Mode.PRIVATE) as revolve20_sk:
        with Locations((-22.9, 1)):
            Rectangle(SKETCH22_W, SKETCH22_H)
        Polygon((-19.7, 0.8), (-19.5, 0.8), (-19.5, 1), (-22.8, 1), (-22.8, 0.8), align=None)
        with Locations((-19.6, 0.525)):
            Rectangle(SKETCH22_W, SKETCH22_H_2)
    revolve(revolve20_sk.sketch.rotate(Axis((2.8, 0, 18.425457789), (0, 0, 1)), 90), axis=Axis((2.8, 0, 18.425457789), (0, 0, 1)))


with BuildPart() as body_25:
    # Sweep1: sweep along a path in Sketch24
    with BuildLine(Plane(origin=(0, 0, 0), x_dir=(0, 0, -1), z_dir=(1, 0, 0))) as sweep1_path:
        ThreePointArc((0, 0), (34.641016151, -8.479326522), (61.449165983, -32))
    # Sketch23 → Sweep1 (sweep)
    with BuildSketch(Plane(origin=(0, 0, 0), x_dir=(-1, 0, 0), z_dir=(0, 0, -1))):
        Circle(SKETCH23_R)
        Circle(SKETCH23_R_2, mode=Mode.SUBTRACT)
    sweep(path=sweep1_path.line)


solid = Compound([part.part, body_2.part, body_3.part, body_4.part, body_5.part, body_6.part, body_7.part, body_8.part, body_9.part, body_10.part, body_11.part, body_12.part, body_13.part, body_14.part, body_15.part, body_16.part, body_17.part, body_18.part, body_19.part, body_20.part, body_21.part, body_22.part, body_23.part, body_24.part, body_25.part])
